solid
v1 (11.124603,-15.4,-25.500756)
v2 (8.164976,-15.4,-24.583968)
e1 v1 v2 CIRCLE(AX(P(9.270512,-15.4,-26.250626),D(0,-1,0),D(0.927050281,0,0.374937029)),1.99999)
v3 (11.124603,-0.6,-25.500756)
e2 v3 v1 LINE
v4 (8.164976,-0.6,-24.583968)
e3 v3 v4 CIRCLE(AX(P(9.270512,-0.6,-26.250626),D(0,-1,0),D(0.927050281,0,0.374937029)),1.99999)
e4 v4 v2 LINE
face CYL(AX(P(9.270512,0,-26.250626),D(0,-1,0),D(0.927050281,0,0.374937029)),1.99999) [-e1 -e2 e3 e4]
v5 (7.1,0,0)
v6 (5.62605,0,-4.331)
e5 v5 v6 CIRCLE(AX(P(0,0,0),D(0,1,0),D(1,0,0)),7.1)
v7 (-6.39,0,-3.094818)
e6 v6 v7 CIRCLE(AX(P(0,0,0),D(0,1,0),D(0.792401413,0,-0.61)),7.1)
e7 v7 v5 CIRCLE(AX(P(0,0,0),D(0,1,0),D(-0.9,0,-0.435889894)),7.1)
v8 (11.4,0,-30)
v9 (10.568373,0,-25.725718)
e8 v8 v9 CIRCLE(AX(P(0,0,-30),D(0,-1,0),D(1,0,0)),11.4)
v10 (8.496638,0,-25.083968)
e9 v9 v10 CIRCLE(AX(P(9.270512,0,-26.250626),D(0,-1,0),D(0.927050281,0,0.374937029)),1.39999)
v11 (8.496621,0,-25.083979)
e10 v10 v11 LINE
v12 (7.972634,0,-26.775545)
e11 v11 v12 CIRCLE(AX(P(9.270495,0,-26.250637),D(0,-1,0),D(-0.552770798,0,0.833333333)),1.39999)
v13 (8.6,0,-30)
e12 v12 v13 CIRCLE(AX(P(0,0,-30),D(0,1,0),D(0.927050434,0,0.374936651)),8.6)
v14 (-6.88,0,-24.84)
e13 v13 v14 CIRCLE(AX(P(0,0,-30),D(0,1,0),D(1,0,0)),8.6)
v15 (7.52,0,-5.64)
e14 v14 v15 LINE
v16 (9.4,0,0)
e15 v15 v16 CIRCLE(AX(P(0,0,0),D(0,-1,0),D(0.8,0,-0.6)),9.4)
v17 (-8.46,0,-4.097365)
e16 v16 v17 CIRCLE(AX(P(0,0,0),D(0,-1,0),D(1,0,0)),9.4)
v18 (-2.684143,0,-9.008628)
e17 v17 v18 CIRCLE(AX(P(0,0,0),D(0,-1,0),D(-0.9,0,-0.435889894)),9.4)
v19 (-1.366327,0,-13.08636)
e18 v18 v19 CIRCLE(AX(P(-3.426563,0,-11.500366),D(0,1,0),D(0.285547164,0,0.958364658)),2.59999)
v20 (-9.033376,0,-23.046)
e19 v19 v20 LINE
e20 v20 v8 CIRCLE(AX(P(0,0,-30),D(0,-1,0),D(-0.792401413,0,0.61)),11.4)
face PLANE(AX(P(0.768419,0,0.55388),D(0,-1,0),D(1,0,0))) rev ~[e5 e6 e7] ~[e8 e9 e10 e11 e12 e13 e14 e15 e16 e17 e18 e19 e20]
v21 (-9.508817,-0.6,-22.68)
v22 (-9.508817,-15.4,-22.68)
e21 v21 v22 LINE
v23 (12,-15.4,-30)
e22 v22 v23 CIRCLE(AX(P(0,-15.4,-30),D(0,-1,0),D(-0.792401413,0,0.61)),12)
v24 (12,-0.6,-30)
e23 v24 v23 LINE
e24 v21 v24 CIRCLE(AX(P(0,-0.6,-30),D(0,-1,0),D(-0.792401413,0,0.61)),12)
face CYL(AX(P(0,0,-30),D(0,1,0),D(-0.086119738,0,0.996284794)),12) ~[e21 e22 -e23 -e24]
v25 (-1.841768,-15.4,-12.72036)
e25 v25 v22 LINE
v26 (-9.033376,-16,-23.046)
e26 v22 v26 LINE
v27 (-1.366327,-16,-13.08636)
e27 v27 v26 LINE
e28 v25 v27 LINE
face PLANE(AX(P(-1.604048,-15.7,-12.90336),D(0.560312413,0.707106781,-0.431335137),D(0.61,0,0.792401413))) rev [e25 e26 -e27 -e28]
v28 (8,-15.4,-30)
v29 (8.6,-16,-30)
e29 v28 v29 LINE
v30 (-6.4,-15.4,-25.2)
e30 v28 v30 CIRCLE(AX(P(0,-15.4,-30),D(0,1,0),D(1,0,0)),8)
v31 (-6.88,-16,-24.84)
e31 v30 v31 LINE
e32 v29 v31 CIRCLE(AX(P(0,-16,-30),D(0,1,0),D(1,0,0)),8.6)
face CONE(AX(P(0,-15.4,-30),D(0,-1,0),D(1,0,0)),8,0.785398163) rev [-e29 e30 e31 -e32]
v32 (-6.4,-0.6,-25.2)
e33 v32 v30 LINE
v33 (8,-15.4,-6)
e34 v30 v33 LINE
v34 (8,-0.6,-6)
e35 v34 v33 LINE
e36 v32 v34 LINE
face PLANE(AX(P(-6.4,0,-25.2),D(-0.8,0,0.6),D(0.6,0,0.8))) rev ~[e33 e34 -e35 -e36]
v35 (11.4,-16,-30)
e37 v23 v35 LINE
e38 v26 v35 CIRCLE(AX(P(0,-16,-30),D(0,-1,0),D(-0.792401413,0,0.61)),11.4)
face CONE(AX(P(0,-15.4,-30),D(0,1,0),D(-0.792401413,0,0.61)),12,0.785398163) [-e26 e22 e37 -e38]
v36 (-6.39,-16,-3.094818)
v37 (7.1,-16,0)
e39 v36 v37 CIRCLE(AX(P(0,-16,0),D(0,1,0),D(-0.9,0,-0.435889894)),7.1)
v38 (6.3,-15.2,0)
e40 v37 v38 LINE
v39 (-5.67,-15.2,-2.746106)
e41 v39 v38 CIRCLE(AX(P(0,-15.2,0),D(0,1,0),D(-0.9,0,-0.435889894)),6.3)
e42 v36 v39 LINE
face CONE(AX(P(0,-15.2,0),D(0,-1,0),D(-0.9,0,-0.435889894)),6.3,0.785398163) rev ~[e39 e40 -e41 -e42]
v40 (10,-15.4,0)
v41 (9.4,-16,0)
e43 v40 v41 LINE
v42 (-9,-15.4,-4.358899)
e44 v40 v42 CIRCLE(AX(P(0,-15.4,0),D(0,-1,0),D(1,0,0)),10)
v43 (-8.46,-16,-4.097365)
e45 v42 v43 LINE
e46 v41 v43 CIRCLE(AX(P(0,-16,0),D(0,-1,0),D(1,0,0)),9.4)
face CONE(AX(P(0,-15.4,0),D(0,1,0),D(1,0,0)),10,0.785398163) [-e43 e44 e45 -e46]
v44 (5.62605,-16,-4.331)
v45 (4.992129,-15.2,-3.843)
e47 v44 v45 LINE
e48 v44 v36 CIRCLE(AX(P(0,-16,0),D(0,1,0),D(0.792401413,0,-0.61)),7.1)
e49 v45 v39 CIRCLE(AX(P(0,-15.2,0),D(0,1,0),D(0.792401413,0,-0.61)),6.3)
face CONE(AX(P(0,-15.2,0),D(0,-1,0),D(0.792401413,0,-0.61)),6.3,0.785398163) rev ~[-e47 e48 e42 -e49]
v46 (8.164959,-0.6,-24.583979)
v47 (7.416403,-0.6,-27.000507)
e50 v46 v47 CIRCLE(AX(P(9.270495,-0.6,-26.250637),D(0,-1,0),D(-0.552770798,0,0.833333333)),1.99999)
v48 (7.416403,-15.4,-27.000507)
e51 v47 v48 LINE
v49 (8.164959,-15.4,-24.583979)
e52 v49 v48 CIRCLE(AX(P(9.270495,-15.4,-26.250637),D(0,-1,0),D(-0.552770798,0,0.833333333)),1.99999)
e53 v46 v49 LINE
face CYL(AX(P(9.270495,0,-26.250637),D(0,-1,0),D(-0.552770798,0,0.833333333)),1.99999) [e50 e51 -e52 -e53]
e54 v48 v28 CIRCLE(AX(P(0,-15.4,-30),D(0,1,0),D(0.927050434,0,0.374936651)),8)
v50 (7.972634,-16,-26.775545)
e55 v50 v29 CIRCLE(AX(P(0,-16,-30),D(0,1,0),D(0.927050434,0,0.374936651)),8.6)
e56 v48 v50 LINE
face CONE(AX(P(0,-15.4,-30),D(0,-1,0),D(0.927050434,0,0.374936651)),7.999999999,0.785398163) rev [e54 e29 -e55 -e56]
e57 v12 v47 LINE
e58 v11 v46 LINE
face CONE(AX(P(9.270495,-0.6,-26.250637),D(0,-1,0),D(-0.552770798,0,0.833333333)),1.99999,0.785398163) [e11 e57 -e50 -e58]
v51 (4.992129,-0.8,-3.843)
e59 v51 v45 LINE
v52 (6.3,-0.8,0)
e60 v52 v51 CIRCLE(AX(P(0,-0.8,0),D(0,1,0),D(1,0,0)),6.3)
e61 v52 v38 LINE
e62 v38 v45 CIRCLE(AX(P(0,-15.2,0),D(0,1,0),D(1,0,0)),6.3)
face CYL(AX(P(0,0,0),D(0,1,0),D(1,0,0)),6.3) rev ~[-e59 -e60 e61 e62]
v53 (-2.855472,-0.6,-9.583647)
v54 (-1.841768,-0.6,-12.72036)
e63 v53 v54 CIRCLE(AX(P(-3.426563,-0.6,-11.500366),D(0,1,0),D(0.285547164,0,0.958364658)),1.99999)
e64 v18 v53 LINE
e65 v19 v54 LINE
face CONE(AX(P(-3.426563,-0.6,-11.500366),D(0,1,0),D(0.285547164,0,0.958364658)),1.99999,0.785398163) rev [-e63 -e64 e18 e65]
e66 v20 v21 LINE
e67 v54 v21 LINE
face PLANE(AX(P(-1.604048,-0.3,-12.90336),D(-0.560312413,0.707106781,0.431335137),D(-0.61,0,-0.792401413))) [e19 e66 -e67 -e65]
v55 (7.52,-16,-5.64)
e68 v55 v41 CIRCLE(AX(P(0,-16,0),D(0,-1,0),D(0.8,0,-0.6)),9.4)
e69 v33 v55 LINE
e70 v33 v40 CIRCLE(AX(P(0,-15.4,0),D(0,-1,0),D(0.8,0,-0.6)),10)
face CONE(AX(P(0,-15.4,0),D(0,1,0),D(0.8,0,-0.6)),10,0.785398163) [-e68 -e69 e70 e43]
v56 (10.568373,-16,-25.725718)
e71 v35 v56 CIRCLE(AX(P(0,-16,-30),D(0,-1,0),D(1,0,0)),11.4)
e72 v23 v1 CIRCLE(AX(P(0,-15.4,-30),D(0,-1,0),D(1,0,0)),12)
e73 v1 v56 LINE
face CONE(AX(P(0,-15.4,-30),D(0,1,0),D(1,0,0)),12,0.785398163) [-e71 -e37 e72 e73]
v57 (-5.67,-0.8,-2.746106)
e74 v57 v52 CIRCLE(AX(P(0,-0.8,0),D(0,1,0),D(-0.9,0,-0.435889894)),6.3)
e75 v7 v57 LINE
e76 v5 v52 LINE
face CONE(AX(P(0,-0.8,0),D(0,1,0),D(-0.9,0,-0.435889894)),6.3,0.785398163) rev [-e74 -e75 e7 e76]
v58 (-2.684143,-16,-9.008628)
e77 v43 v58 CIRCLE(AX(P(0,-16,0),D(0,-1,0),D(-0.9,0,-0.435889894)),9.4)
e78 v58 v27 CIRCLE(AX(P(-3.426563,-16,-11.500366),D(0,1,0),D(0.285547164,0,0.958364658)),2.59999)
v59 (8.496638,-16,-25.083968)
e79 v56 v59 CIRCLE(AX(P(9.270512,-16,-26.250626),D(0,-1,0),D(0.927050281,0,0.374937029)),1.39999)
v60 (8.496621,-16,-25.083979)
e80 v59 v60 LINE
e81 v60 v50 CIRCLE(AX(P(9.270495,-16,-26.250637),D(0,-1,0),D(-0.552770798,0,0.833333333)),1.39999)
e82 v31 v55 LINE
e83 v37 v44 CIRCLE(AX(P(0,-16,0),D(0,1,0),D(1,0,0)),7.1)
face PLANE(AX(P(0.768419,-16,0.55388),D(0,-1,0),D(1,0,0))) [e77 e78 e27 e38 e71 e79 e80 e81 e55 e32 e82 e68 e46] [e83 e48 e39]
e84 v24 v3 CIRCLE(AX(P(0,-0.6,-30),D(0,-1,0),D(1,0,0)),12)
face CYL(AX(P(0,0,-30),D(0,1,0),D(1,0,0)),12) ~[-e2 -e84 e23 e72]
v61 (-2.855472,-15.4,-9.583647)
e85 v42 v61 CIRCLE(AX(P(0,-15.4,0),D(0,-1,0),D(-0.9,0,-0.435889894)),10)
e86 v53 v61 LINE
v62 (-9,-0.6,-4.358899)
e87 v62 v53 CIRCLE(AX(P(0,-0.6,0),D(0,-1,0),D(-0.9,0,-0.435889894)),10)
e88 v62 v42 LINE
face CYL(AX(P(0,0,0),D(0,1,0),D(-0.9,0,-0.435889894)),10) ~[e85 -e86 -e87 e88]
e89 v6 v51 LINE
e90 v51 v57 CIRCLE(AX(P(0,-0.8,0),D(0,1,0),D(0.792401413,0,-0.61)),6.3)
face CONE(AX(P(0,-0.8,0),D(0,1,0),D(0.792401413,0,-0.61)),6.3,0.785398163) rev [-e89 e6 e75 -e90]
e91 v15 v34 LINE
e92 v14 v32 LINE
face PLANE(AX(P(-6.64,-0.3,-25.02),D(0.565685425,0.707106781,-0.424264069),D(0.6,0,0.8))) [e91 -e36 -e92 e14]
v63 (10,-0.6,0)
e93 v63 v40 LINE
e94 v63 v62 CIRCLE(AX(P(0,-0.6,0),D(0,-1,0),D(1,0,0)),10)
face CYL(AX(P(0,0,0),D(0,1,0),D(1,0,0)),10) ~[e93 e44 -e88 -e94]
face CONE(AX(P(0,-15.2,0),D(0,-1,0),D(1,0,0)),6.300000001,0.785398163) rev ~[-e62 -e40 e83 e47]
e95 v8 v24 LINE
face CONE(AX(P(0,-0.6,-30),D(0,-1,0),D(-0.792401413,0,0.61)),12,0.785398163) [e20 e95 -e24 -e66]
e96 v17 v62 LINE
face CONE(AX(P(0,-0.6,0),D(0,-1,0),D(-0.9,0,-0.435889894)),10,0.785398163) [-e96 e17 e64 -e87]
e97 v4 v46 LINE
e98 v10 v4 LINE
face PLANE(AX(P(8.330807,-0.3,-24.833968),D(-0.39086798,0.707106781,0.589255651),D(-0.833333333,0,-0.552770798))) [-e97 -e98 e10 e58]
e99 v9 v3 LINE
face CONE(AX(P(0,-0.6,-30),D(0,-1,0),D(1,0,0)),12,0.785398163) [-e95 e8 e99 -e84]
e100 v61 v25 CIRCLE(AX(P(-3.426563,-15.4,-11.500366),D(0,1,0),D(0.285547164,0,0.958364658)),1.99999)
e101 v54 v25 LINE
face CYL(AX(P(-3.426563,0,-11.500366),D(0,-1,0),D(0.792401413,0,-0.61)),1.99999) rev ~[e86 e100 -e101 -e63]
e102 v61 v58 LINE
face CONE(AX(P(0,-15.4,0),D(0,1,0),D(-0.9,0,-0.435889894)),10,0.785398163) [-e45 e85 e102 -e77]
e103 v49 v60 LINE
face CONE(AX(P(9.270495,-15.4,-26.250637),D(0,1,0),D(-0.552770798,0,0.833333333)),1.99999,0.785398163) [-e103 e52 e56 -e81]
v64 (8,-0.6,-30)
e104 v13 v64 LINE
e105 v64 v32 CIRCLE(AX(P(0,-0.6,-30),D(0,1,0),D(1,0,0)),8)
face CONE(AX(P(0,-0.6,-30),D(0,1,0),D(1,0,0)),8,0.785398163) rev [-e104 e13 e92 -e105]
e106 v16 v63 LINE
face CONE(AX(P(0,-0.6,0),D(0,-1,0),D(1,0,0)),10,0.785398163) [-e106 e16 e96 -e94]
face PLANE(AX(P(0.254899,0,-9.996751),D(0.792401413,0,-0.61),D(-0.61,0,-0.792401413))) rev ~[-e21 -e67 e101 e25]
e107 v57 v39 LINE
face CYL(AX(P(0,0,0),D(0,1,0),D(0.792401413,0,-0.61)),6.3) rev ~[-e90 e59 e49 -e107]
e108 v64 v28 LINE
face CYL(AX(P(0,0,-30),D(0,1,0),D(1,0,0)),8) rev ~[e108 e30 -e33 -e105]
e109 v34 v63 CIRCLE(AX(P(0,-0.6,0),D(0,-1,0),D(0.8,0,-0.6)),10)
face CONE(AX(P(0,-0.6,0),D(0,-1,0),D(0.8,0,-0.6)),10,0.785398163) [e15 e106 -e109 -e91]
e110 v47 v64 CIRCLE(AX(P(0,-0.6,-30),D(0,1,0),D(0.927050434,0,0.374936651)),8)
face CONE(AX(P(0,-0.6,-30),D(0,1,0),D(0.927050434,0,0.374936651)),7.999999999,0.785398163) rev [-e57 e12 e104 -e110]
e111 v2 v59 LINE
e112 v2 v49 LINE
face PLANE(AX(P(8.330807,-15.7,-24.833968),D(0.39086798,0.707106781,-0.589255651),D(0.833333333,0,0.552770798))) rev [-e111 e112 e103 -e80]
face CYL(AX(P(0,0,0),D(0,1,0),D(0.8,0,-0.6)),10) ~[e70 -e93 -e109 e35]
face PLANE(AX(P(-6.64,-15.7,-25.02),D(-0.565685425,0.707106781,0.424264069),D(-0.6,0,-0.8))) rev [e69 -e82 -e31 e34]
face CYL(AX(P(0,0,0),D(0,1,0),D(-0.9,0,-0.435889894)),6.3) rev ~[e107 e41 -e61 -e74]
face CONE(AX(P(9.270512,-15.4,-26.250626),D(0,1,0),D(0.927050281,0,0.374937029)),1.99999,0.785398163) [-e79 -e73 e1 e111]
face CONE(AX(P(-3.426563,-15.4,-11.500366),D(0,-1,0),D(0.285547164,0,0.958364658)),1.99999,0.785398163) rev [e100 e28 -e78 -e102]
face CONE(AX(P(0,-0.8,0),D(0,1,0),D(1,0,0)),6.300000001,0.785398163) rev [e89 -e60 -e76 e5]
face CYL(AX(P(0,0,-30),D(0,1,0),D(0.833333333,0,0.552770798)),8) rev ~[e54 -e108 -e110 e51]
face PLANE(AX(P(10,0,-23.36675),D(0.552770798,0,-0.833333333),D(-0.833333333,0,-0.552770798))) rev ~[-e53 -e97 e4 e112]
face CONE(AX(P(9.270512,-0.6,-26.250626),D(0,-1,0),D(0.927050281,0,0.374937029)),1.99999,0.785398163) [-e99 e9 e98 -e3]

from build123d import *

# Parameters (mm, degrees)
F1_DEPTH = 16
F2_R     = 1.99999
F3_SIZE  = 0.8
F4_SIZE  = 0.6


# Not quite as in the source:
# - a fillet or chamfer is up to 0.001 mm smaller than in the source, because OpenCascade refuses the exact size


with BuildPart() as f1:
    # F0 (on Front) → F1 (new body)
    with BuildSketch(Plane.XZ):
        with BuildLine():
            ThreePointArc((6.3, 0), (5.9640762947, -2.0297275557), (4.9921289046, -3.843))
            Line((4.9921289046, -3.843), (0.2548985956, -9.9967508074))
            ThreePointArc((0.2548985956, -9.9967508074), (4.5857760478, -8.8865436498), (8, -6))
            ThreePointArc((8, -6), (9.4868329805, -3.1622776602), (10, 0))
            ThreePointArc((10, 0), (-2.2360679775, 9.7467943448), (-9, -4.3588989435))
            Line((-9, -4.3588989435), (-5.67, -2.7461063344))
            ThreePointArc((-5.67, -2.7461063344), (-1.4087228258, 6.1404804372), (6.3, 0))
        make_face()
        with BuildLine():
            ThreePointArc((8, -6), (4.5857760478, -8.8865436498), (0.2548985956, -9.9967508074))
            Line((0.2548985956, -9.9967508074), (-9.5088169611, -22.68))
            ThreePointArc((-9.5088169611, -22.68), (-5.7581726954, -19.4717785353), (-1.033436854, -18.044582472))
            Line((-1.033436854, -18.044582472), (8, -6))
        make_face()
        with BuildLine():
            ThreePointArc((-1.033436854, -18.044582472), (-5.7581726954, -19.4717785353), (-9.5088169611, -22.68))
            ThreePointArc((-9.5088169611, -22.68), (-3.8661477252, -41.3601453233), (12, -30))
            ThreePointArc((12, -30), (11.4891252931, -26.5358983849), (10, -23.3667504193))
            Line((10, -23.3667504193), (6.6666666667, -25.5778336129))
            ThreePointArc((6.6666666667, -25.5778336129), (7.6594168621, -27.6905989232), (8, -30))
            ThreePointArc((8, -30), (-2.5298221281, -37.5894663844), (-6.4, -25.2))
            Line((-6.4, -25.2), (-1.033436854, -18.044582472))
        make_face()
        with BuildLine():
            Line((0.2548985956, -9.9967508074), (4.9921289046, -3.843))
            ThreePointArc((4.9921289046, -3.843), (-0.6447257044, -6.2669233892), (-5.67, -2.7461063344))
            Line((-5.67, -2.7461063344), (-9, -4.3588989435))
            ThreePointArc((-9, -4.3588989435), (-5.202455483, -8.5401672669), (0.2548985956, -9.9967508074))
        make_face()
    extrude(amount=F1_DEPTH)

    # F2 (radius 2 in the source; OpenCascade refuses exactly that, so slightly less here)
    f2_edges = [f1.edges().sort_by_distance(p)[0] for p in [
        (4.992129, -8, -3.843),
        (8, -8, -6),
        (10, -8, -23.36675),
        (6.666667, -8, -25.577834),
        (0.254899, -8, -9.996751),
    ]]
    fillet(f2_edges, radius=F2_R)

    # F3
    f3_edges = [f1.edges().sort_by_distance(p)[0] for p in [
        (-4.992129, -16, 3.843),
        (-4.992129, 0, 3.843),
    ]]
    chamfer(f3_edges, length=F3_SIZE)

    # F4
    f4_edges = [f1.edges().sort_by_distance(p)[0] for p in [
        (-3.134832, -16, 9.495937),
        (0.8, 0, -15.6),
        (-5.675293, 0, -17.70018),
        (-1.523485, 0, -10.885342),
        (-1.625379, 0, -41.889413),
        (-3.134832, 0, 9.495937),
        (9.862297, 0, -24.340194),
        (8.164968, 0, -24.583973),
        (-1.033792, 0, -37.932923),
        (7.360063, 0, -25.658852),
        (-5.675293, -16, -17.70018),
        (-1.523485, -16, -10.885342),
        (-1.625379, -16, -41.889413),
        (9.862297, -16, -24.340194),
        (0.8, -16, -15.6),
        (8.164968, -16, -24.583973),
        (-1.033792, -16, -37.932923),
        (7.360063, -16, -25.658852),
    ]]
    chamfer(f4_edges, length=F4_SIZE)


solid = f1.part
